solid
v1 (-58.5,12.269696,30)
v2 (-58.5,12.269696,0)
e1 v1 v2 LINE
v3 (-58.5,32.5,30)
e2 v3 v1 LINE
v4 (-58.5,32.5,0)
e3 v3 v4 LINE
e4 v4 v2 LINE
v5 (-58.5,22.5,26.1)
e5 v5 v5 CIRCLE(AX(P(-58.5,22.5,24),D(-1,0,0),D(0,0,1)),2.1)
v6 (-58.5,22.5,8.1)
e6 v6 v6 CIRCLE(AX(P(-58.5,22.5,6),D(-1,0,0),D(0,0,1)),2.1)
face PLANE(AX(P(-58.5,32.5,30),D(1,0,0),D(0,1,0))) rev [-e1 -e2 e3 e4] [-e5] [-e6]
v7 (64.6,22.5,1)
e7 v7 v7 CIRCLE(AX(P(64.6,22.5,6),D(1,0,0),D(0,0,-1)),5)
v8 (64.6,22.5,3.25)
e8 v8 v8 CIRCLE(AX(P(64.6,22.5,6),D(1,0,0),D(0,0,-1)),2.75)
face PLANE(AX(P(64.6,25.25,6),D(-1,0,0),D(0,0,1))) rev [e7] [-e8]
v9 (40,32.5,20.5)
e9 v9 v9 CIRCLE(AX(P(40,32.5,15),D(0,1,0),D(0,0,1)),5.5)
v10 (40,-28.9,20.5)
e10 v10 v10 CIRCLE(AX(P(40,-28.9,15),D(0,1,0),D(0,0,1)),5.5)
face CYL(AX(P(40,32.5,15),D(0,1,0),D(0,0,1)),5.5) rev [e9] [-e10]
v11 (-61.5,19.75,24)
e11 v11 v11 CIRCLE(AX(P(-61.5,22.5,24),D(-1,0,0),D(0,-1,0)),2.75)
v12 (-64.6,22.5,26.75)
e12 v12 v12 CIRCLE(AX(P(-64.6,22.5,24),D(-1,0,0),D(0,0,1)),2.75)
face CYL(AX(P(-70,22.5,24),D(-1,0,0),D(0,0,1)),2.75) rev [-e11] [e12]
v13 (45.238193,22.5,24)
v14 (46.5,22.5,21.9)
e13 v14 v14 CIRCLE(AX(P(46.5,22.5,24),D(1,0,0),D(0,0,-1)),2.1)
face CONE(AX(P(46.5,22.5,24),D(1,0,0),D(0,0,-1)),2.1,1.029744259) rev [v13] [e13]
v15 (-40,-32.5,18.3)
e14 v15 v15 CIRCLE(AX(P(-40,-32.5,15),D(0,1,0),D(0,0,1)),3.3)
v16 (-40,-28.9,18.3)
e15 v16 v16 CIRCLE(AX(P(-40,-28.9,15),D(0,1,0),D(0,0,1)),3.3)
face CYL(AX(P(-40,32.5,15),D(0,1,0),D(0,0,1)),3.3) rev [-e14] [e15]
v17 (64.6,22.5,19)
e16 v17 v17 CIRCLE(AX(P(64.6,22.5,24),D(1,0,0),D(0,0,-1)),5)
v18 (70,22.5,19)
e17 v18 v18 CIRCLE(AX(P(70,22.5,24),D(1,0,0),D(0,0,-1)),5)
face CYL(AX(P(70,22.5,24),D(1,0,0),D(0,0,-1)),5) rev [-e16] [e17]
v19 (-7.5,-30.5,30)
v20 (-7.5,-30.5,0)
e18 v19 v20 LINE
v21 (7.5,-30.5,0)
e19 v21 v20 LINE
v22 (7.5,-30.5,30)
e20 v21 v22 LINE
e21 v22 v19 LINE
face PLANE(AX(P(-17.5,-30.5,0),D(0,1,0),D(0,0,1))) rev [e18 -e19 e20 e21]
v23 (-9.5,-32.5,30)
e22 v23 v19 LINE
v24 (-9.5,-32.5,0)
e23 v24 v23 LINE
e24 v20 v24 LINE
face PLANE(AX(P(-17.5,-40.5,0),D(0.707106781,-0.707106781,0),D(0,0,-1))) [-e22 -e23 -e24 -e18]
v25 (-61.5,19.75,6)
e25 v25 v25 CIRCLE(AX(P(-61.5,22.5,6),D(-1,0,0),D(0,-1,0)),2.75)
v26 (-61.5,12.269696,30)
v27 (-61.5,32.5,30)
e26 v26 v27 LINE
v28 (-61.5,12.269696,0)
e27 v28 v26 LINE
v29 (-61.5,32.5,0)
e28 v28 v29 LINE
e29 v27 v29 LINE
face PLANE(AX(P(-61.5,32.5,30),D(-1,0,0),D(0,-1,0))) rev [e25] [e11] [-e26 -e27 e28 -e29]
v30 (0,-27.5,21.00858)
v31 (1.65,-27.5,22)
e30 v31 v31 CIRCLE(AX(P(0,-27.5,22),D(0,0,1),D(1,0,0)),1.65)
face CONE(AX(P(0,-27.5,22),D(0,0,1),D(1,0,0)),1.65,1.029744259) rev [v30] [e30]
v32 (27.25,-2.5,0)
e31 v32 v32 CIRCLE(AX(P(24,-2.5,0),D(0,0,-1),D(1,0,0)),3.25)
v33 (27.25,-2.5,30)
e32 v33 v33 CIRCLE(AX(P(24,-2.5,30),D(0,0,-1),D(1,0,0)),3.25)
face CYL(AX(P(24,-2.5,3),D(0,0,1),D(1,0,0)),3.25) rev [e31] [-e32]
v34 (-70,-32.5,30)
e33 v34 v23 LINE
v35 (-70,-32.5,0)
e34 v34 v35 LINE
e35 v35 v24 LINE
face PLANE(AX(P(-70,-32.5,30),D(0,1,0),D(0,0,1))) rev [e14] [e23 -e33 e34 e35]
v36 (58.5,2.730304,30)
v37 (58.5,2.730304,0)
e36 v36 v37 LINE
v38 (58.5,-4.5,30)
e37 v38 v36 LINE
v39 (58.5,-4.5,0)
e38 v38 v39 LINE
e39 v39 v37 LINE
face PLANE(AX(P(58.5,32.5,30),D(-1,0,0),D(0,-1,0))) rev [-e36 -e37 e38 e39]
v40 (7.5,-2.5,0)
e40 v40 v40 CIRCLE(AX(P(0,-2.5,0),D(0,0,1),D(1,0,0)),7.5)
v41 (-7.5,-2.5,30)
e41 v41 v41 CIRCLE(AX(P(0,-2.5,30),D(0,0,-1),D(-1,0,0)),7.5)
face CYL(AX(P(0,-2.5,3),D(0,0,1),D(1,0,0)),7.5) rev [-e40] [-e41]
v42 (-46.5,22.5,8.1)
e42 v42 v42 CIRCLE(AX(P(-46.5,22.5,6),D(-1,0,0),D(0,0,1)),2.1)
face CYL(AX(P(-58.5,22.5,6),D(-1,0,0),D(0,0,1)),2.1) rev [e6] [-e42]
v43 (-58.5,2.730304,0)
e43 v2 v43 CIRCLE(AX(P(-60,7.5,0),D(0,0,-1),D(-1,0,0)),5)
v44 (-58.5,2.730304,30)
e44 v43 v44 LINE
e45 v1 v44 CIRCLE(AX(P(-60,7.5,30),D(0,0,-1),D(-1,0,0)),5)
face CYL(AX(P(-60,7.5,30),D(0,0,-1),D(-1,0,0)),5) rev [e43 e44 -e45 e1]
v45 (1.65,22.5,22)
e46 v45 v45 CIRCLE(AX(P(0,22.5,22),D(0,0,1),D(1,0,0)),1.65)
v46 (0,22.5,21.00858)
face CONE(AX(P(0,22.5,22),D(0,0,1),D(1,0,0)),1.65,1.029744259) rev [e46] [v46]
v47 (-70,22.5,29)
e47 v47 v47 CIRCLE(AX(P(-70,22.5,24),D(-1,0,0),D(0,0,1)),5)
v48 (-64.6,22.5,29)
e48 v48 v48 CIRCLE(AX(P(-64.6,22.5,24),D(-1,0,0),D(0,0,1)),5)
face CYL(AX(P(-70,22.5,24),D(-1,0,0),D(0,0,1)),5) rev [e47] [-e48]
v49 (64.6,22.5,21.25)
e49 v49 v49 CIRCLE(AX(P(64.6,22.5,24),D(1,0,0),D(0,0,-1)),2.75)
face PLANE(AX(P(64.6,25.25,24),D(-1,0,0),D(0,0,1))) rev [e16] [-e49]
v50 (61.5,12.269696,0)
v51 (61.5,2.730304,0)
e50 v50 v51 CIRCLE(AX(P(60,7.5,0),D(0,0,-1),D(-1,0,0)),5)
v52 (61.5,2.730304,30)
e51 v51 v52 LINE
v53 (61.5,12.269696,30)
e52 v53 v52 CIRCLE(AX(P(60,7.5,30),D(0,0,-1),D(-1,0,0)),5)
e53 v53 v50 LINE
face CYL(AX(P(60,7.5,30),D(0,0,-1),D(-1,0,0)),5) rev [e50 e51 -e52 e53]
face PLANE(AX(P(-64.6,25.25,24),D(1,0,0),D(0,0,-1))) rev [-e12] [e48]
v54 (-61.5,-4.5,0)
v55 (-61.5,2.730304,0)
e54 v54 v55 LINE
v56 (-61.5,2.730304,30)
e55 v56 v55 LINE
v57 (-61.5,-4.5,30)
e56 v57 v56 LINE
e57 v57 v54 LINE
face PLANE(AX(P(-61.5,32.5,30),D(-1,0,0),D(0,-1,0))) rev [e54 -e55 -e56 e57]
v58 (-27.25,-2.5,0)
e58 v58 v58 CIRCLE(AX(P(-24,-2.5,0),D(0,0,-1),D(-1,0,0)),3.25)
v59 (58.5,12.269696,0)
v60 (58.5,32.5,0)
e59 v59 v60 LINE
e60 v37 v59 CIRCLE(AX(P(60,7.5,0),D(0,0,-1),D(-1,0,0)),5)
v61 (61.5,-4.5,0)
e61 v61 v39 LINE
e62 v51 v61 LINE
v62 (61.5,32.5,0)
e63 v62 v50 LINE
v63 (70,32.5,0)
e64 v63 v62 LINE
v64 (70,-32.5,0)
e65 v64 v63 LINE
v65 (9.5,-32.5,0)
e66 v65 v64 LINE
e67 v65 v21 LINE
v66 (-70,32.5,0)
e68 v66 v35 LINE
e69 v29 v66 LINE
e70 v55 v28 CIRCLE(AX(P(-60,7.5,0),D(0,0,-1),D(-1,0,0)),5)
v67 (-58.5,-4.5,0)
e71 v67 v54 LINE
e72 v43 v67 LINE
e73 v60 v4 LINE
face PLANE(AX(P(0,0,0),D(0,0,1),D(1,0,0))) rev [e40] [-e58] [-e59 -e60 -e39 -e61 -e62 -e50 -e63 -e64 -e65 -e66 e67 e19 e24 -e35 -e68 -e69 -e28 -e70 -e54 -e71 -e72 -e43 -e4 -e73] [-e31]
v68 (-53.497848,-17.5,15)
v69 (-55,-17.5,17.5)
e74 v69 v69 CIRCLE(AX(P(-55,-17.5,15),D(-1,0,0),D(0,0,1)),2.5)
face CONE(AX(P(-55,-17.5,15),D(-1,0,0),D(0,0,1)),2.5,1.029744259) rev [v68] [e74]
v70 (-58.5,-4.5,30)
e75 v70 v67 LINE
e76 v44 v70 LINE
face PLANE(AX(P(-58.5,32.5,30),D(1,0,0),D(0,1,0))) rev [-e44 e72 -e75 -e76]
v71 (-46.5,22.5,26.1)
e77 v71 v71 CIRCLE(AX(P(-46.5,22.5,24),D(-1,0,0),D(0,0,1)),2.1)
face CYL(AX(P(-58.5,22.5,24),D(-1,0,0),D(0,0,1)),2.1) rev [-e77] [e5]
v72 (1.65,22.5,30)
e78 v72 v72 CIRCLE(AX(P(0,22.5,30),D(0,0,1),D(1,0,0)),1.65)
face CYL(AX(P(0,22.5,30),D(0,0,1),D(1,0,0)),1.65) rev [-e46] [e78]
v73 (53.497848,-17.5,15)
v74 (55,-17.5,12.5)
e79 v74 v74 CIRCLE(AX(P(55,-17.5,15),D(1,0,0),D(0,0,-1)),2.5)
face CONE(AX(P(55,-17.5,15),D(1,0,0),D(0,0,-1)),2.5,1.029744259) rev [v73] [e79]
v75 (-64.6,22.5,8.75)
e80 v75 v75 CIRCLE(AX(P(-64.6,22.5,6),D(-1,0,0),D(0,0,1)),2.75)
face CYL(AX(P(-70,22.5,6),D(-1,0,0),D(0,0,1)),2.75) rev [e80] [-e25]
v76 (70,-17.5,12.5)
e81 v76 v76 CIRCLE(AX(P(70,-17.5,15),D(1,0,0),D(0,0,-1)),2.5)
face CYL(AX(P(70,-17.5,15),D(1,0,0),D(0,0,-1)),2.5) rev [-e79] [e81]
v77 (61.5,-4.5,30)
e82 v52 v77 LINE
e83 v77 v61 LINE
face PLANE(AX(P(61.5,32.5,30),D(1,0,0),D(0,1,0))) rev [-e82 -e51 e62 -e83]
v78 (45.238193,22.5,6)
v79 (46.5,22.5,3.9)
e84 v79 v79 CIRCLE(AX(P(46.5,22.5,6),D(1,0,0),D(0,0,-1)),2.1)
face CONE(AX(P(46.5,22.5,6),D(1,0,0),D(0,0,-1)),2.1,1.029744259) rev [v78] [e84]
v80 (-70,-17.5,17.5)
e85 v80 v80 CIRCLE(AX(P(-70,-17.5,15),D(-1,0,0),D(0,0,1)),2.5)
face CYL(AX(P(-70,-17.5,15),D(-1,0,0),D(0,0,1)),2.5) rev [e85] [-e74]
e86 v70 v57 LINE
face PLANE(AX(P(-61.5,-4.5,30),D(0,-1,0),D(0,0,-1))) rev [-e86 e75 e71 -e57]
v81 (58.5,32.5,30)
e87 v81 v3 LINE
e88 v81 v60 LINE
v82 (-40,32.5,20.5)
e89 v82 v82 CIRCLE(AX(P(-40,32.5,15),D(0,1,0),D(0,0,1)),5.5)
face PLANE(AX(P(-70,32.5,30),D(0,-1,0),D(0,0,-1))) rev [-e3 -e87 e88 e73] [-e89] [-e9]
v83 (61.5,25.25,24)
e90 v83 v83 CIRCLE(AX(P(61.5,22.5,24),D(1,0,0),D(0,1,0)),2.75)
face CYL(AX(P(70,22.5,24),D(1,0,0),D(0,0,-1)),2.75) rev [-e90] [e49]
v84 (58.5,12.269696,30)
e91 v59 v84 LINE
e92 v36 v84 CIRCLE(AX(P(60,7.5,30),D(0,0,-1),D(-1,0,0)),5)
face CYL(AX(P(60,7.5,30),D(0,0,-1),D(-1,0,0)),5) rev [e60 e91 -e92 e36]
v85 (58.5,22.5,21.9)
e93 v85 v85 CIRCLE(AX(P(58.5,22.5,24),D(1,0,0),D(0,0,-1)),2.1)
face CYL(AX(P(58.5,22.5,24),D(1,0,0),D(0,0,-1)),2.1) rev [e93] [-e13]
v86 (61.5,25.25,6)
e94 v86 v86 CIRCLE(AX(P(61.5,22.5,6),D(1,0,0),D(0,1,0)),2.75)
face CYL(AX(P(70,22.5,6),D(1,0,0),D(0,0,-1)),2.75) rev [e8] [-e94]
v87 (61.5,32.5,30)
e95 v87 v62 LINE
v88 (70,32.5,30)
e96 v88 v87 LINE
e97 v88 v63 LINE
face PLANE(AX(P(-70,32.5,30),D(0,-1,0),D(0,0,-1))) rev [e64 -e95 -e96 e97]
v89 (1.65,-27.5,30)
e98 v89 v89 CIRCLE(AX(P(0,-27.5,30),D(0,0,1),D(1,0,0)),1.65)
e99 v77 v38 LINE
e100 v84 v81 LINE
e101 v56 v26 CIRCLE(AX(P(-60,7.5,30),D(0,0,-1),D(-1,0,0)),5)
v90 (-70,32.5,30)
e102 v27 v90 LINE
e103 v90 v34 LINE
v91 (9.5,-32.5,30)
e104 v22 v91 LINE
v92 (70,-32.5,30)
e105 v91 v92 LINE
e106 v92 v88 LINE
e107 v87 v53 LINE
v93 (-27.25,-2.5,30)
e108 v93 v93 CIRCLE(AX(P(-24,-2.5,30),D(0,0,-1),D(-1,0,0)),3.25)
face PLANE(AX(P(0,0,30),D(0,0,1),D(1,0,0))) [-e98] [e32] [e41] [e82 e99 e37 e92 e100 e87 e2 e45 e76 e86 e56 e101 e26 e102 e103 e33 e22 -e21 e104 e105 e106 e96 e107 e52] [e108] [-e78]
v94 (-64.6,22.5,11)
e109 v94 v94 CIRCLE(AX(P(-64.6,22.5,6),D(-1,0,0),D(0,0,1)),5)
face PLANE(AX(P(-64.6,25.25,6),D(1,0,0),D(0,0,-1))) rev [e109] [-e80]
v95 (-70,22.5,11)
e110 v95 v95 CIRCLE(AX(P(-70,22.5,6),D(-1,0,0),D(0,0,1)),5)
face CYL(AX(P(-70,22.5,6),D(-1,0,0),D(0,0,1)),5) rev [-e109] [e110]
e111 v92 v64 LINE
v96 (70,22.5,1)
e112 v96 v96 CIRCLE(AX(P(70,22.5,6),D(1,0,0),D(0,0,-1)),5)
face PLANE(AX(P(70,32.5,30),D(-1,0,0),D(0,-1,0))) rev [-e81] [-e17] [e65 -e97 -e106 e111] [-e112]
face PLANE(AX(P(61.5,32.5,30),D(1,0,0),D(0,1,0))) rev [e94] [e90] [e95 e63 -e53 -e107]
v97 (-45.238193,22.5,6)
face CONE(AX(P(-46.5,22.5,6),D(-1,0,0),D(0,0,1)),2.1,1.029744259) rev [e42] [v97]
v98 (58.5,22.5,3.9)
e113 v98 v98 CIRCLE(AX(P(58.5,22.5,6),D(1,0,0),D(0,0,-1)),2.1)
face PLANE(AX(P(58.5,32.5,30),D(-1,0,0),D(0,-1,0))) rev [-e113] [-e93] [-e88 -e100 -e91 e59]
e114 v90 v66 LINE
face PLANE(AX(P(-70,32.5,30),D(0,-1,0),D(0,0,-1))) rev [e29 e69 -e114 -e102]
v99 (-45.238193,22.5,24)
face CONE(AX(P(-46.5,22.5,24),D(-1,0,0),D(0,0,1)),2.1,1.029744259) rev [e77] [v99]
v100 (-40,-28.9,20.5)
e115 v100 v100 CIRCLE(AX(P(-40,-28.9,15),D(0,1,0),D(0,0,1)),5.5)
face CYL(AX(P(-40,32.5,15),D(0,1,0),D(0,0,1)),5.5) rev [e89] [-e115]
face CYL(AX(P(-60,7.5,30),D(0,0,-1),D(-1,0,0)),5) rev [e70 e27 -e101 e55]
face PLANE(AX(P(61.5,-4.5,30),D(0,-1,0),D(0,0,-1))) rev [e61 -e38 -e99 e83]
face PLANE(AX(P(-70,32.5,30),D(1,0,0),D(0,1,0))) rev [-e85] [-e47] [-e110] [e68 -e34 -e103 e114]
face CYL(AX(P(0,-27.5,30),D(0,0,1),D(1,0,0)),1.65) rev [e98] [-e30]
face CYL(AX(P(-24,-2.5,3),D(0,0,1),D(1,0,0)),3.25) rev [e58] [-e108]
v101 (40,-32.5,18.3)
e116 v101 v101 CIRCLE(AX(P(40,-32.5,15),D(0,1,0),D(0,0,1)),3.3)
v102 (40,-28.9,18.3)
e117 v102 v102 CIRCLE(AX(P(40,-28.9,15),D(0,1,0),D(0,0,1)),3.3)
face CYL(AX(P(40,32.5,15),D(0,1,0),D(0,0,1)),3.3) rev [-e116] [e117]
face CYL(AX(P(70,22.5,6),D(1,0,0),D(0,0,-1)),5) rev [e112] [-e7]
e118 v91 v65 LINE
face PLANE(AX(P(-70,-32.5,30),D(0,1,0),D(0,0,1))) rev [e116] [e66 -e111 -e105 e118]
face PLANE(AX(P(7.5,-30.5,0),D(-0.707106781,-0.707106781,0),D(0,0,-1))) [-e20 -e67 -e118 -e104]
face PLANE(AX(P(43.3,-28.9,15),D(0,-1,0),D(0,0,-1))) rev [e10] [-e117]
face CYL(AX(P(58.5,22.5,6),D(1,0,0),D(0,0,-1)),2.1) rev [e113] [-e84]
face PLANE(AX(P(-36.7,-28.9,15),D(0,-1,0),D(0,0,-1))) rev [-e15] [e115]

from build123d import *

# Parameters (mm, degrees)
SKETCH1_W                                           = 140
SKETCH1_H                                           = 65
BOSS_EXTRUDE1_DEPTH                                 = 30
SKETCH2_R                                           = 7.5
SKETCH2_R_2                                         = 3.25
CUT_EXTRUDE2_DEPTH                                  = 27
SKETCH4_R                                           = 7.5
CUT_EXTRUDE3_DEPTH                                  = 82.76337811
SKETCH5_R                                           = 5
CUT_EXTRUDE4_DEPTH                                  = 83.802475808
SKETCH6_W                                           = 3
SKETCH6_H                                           = 37
CUT_EXTRUDE5_DEPTH                                  = 83.802475808
CBORE_FOR_M5_HEX_SOCKET_HEAD_CAP_SCREW1_D           = 5.5
CBORE_FOR_M5_HEX_SOCKET_HEAD_CAP_SCREW1_DEPTH       = 8.5
CBORE_FOR_M5_HEX_SOCKET_HEAD_CAP_SCREW1_CBORE_D     = 10
CBORE_FOR_M5_HEX_SOCKET_HEAD_CAP_SCREW1_CBORE_DEPTH = 5.4
TAP_DRILL_FOR_M5_TAP1_AT_2_COUNT                    = 2
TAP_DRILL_FOR_M5_TAP1_AT_2_PITCH                    = 18
CBORE_FOR_M6_HEX_SOCKET_HEAD_CAP_SCREW3_D           = 6.6
CBORE_FOR_M6_HEX_SOCKET_HEAD_CAP_SCREW3_CBORE_D     = 11
CBORE_FOR_M6_HEX_SOCKET_HEAD_CAP_SCREW3_CBORE_DEPTH = 61.4
CIRPATTERN1_COUNT                                   = 4
SKETCH29_W                                          = 35
SKETCH29_H                                          = 2
CUT_EXTRUDE6_DEPTH                                  = 83.802475808
CHAMFER2_SIZE                                       = 10
SKETCH2_2_R                                         = 7.5
SKETCH2_2_R_2                                       = 3.25
CUT_EXTRUDE7_DEPTH                                  = 83.802475808


with BuildPart() as part:
    # Sketch1 → Boss-Extrude1 (new body)
    with BuildSketch(Plane.XY):
        Rectangle(SKETCH1_W, SKETCH1_H)
    extrude(amount=BOSS_EXTRUDE1_DEPTH)

    # Sketch2 → Cut-Extrude2 (cut)
    with BuildSketch(Plane(origin=(0, 0, 30), x_dir=(-1, 0, 0), z_dir=(0, 0, -1))):
        with Locations((0, -2.5)):
            Circle(SKETCH2_R)
        with Locations((24, -2.5)):
            Circle(SKETCH2_R_2)
        with Locations(Location((-24, -2.5, 0), (0, 0, 180))):
            Circle(SKETCH2_R_2)
    extrude(amount=CUT_EXTRUDE2_DEPTH, mode=Mode.SUBTRACT)

    # Sketch4 → Cut-Extrude3 (cut, through all)
    with BuildSketch(Plane.XY.offset(3)):
        with Locations((0, -2.5)):
            Circle(SKETCH4_R)
    extrude(amount=-CUT_EXTRUDE3_DEPTH, mode=Mode.SUBTRACT)

    # Sketch5 → Cut-Extrude4 (cut, through all)
    with BuildSketch(Plane(origin=(0, 0, 0), x_dir=(-1, 0, 0), z_dir=(0, 0, -1))):
        with Locations((-60, 7.5)):
            Circle(SKETCH5_R)
        with Locations((60, 7.5)):
            Circle(SKETCH5_R)
    extrude(amount=-CUT_EXTRUDE4_DEPTH, mode=Mode.SUBTRACT)

    # Sketch6 → Cut-Extrude5 (cut, through all)
    with BuildSketch(Plane(origin=(0, 0, 0), x_dir=(-1, 0, 0), z_dir=(0, 0, -1))):
        with Locations((-60, 14)):
            Rectangle(SKETCH6_W, SKETCH6_H)
        with Locations((60, 14)):
            Rectangle(SKETCH6_W, SKETCH6_H)
    extrude(amount=-CUT_EXTRUDE5_DEPTH, mode=Mode.SUBTRACT)

    # CBORE for M5 Hex Socket Head Cap Screw1
    with Locations(Plane(origin=(70, 0, 0), x_dir=(0, 0, -1), z_dir=(1, 0, 0))):
        with Locations((-6, 22.5), (-24, 22.5)):
            cbore_for_m5_hex_socket_head_cap_screw1 = CounterBoreHole(CBORE_FOR_M5_HEX_SOCKET_HEAD_CAP_SCREW1_D / 2, CBORE_FOR_M5_HEX_SOCKET_HEAD_CAP_SCREW1_CBORE_D / 2, CBORE_FOR_M5_HEX_SOCKET_HEAD_CAP_SCREW1_CBORE_DEPTH, depth=CBORE_FOR_M5_HEX_SOCKET_HEAD_CAP_SCREW1_DEPTH)

    # Sketch12 → Tap Drill for M5 Tap1 (revolve, cut)
    with BuildSketch(Plane(origin=(58.5, 22.5, 6), x_dir=(0, 0, -1), z_dir=(0, 1, 0))):
        Polygon((0, 0), (0, 13.2618073), (2.1, 12), (2.1, 0), align=None)
    tap_drill_for_m5_tap1 = revolve(axis=Axis((64.85, 22.5, 6), (-1, 0, 0)), mode=Mode.SUBTRACT)

    # Tap Drill for M5 Tap1 at 2: Tap Drill for M5 Tap1 ×2
    with Locations(*[(0, 0, i * TAP_DRILL_FOR_M5_TAP1_AT_2_PITCH) for i in range(1, TAP_DRILL_FOR_M5_TAP1_AT_2_COUNT)]):
        add(tap_drill_for_m5_tap1, mode=Mode.SUBTRACT)

    # Sketch15 → Tap Drill for M6 Tap1 (revolve, cut)
    with BuildSketch(Plane(origin=(70, -17.5, 15), x_dir=(0, 0, -1), z_dir=(0, 1, 0))):
        Polygon((0, 0), (0, 16.502151548), (2.5, 15), (2.5, 0), align=None)
    tap_drill_for_m6_tap1 = revolve(axis=Axis((76.35, -17.5, 15), (-1, 0, 0)), mode=Mode.SUBTRACT)

    # Mirror1: CBORE for M5 Hex Socket Head Cap Screw1, Tap Drill for M5 Tap1, Tap Drill for M6 Tap1 across plane
    add(cbore_for_m5_hex_socket_head_cap_screw1.mirror(Plane(origin=(0, 0, 0), x_dir=(0, 0, 1), z_dir=(1, 0, 0))), mode=Mode.SUBTRACT)
    add(tap_drill_for_m5_tap1.mirror(Plane(origin=(0, 0, 0), x_dir=(0, 0, 1), z_dir=(1, 0, 0))), mode=Mode.SUBTRACT)
    add(tap_drill_for_m6_tap1.mirror(Plane(origin=(0, 0, 0), x_dir=(0, 0, 1), z_dir=(1, 0, 0))), mode=Mode.SUBTRACT)

    # Mirror1 copy 1 sketch → Mirror1 copy 1 (revolve, cut)
    with BuildSketch(Plane(origin=(-58.5, 22.5, 24), x_dir=(0, 0, -1), z_dir=(0, 1, 0))):
        Polygon((0, 0), (0, -13.2618073), (2.1, -12), (2.1, 0), align=None)
    revolve(axis=Axis((-64.85, 22.5, 24), (-1, 0, 0)), mode=Mode.SUBTRACT)

    # CBORE for M6 Hex Socket Head Cap Screw3 (through all)
    with Locations(Plane(origin=(0, 32.5, 0), x_dir=(1, 0, 0), z_dir=(0, 1, 0))):
        with Locations((40, -15), (-40, -15)):
            CounterBoreHole(CBORE_FOR_M6_HEX_SOCKET_HEAD_CAP_SCREW3_D / 2, CBORE_FOR_M6_HEX_SOCKET_HEAD_CAP_SCREW3_CBORE_D / 2, CBORE_FOR_M6_HEX_SOCKET_HEAD_CAP_SCREW3_CBORE_DEPTH)

    # Sketch28 → Tap Drill for M4 Tap1 (revolve, cut)
    with BuildSketch(Plane(origin=(0, 22.5, 30), x_dir=(0, -1, 0), z_dir=(1, 0, 0))):
        Polygon((0, 0), (0, 8.991420021), (1.65, 8), (1.65, 0), align=None)
    tap_drill_for_m4_tap1 = revolve(axis=Axis((0, 22.5, 36.35), (0, 0, -1)), mode=Mode.SUBTRACT)

    # CirPattern1: Tap Drill for M4 Tap1 ×4 about axis, 2 skipped
    cirpattern1_axis = Axis((0, -2.5, 3), (0, 0, 1))
    add([tap_drill_for_m4_tap1.rotate(cirpattern1_axis, i * 360 / CIRPATTERN1_COUNT) for i in range(1, CIRPATTERN1_COUNT) if i not in (1, 3)], mode=Mode.SUBTRACT)

    # Sketch29 → Cut-Extrude6 (cut, through all)
    with BuildSketch(Plane.XY.offset(30)):
        with Locations((0, -31.5)):
            Rectangle(SKETCH29_W, SKETCH29_H)
    extrude(amount=-CUT_EXTRUDE6_DEPTH, mode=Mode.SUBTRACT)

    # Chamfer2
    # the kernel refuses this chamfer: 10 mm, written as the material it adds along each edge
    with BuildSketch(Plane(origin=(-17.5, -30.5, 30), x_dir=(-0.02749587661058977, -0.9996219169112965, 0), z_dir=(0, 0, -1))) as chamfer2_piece_1_section:
        Polygon((CHAMFER2_SIZE * 0.999621916911, -CHAMFER2_SIZE * 0.0274958766106), (-CHAMFER2_SIZE * 0.0274958766106, -CHAMFER2_SIZE * 0.999621916911), (0, 0), align=None)
    chamfer2_piece_1 = extrude(amount=30, mode=Mode.PRIVATE)
    chamfer2_piece_1 = split(chamfer2_piece_1, bisect_by=Plane(origin=(-12.880949734, -32.5, 15), z_dir=(0, 1, 0)), keep=Keep.TOP, mode=Mode.PRIVATE)
    add(chamfer2_piece_1)
    with BuildSketch(Plane(origin=(17.5, -30.5, 30), x_dir=(-0.9996219169112968, 0.027495876610586317, 0), z_dir=(0, 0, -1))) as chamfer2_piece_2_section:
        Polygon((CHAMFER2_SIZE * 0.999621916911, -CHAMFER2_SIZE * 0.0274958766106), (-CHAMFER2_SIZE * 0.0274958766106, -CHAMFER2_SIZE * 0.999621916911), (0, 0), align=None)
    chamfer2_piece_2 = extrude(amount=30, mode=Mode.PRIVATE)
    chamfer2_piece_2 = split(chamfer2_piece_2, bisect_by=Plane(origin=(12.880949734, -32.5, 15), z_dir=(0, 1, 0)), keep=Keep.TOP, mode=Mode.PRIVATE)
    add(chamfer2_piece_2)

    # Sketch2<2> → Cut-Extrude7 (cut, through all)
    with BuildSketch(Plane(origin=(0, 0, 30), x_dir=(-1, 0, 0), z_dir=(0, 0, -1))):
        with Locations(Location((0, -2.5, 0), (0, 0, 180))):
            Circle(SKETCH2_2_R)
        with Locations((24, -2.5)):
            Circle(SKETCH2_2_R_2)
        with Locations(Location((-24, -2.5, 0), (0, 0, 180))):
            Circle(SKETCH2_2_R_2)
    extrude(amount=CUT_EXTRUDE7_DEPTH, mode=Mode.SUBTRACT)


solid = part.part
